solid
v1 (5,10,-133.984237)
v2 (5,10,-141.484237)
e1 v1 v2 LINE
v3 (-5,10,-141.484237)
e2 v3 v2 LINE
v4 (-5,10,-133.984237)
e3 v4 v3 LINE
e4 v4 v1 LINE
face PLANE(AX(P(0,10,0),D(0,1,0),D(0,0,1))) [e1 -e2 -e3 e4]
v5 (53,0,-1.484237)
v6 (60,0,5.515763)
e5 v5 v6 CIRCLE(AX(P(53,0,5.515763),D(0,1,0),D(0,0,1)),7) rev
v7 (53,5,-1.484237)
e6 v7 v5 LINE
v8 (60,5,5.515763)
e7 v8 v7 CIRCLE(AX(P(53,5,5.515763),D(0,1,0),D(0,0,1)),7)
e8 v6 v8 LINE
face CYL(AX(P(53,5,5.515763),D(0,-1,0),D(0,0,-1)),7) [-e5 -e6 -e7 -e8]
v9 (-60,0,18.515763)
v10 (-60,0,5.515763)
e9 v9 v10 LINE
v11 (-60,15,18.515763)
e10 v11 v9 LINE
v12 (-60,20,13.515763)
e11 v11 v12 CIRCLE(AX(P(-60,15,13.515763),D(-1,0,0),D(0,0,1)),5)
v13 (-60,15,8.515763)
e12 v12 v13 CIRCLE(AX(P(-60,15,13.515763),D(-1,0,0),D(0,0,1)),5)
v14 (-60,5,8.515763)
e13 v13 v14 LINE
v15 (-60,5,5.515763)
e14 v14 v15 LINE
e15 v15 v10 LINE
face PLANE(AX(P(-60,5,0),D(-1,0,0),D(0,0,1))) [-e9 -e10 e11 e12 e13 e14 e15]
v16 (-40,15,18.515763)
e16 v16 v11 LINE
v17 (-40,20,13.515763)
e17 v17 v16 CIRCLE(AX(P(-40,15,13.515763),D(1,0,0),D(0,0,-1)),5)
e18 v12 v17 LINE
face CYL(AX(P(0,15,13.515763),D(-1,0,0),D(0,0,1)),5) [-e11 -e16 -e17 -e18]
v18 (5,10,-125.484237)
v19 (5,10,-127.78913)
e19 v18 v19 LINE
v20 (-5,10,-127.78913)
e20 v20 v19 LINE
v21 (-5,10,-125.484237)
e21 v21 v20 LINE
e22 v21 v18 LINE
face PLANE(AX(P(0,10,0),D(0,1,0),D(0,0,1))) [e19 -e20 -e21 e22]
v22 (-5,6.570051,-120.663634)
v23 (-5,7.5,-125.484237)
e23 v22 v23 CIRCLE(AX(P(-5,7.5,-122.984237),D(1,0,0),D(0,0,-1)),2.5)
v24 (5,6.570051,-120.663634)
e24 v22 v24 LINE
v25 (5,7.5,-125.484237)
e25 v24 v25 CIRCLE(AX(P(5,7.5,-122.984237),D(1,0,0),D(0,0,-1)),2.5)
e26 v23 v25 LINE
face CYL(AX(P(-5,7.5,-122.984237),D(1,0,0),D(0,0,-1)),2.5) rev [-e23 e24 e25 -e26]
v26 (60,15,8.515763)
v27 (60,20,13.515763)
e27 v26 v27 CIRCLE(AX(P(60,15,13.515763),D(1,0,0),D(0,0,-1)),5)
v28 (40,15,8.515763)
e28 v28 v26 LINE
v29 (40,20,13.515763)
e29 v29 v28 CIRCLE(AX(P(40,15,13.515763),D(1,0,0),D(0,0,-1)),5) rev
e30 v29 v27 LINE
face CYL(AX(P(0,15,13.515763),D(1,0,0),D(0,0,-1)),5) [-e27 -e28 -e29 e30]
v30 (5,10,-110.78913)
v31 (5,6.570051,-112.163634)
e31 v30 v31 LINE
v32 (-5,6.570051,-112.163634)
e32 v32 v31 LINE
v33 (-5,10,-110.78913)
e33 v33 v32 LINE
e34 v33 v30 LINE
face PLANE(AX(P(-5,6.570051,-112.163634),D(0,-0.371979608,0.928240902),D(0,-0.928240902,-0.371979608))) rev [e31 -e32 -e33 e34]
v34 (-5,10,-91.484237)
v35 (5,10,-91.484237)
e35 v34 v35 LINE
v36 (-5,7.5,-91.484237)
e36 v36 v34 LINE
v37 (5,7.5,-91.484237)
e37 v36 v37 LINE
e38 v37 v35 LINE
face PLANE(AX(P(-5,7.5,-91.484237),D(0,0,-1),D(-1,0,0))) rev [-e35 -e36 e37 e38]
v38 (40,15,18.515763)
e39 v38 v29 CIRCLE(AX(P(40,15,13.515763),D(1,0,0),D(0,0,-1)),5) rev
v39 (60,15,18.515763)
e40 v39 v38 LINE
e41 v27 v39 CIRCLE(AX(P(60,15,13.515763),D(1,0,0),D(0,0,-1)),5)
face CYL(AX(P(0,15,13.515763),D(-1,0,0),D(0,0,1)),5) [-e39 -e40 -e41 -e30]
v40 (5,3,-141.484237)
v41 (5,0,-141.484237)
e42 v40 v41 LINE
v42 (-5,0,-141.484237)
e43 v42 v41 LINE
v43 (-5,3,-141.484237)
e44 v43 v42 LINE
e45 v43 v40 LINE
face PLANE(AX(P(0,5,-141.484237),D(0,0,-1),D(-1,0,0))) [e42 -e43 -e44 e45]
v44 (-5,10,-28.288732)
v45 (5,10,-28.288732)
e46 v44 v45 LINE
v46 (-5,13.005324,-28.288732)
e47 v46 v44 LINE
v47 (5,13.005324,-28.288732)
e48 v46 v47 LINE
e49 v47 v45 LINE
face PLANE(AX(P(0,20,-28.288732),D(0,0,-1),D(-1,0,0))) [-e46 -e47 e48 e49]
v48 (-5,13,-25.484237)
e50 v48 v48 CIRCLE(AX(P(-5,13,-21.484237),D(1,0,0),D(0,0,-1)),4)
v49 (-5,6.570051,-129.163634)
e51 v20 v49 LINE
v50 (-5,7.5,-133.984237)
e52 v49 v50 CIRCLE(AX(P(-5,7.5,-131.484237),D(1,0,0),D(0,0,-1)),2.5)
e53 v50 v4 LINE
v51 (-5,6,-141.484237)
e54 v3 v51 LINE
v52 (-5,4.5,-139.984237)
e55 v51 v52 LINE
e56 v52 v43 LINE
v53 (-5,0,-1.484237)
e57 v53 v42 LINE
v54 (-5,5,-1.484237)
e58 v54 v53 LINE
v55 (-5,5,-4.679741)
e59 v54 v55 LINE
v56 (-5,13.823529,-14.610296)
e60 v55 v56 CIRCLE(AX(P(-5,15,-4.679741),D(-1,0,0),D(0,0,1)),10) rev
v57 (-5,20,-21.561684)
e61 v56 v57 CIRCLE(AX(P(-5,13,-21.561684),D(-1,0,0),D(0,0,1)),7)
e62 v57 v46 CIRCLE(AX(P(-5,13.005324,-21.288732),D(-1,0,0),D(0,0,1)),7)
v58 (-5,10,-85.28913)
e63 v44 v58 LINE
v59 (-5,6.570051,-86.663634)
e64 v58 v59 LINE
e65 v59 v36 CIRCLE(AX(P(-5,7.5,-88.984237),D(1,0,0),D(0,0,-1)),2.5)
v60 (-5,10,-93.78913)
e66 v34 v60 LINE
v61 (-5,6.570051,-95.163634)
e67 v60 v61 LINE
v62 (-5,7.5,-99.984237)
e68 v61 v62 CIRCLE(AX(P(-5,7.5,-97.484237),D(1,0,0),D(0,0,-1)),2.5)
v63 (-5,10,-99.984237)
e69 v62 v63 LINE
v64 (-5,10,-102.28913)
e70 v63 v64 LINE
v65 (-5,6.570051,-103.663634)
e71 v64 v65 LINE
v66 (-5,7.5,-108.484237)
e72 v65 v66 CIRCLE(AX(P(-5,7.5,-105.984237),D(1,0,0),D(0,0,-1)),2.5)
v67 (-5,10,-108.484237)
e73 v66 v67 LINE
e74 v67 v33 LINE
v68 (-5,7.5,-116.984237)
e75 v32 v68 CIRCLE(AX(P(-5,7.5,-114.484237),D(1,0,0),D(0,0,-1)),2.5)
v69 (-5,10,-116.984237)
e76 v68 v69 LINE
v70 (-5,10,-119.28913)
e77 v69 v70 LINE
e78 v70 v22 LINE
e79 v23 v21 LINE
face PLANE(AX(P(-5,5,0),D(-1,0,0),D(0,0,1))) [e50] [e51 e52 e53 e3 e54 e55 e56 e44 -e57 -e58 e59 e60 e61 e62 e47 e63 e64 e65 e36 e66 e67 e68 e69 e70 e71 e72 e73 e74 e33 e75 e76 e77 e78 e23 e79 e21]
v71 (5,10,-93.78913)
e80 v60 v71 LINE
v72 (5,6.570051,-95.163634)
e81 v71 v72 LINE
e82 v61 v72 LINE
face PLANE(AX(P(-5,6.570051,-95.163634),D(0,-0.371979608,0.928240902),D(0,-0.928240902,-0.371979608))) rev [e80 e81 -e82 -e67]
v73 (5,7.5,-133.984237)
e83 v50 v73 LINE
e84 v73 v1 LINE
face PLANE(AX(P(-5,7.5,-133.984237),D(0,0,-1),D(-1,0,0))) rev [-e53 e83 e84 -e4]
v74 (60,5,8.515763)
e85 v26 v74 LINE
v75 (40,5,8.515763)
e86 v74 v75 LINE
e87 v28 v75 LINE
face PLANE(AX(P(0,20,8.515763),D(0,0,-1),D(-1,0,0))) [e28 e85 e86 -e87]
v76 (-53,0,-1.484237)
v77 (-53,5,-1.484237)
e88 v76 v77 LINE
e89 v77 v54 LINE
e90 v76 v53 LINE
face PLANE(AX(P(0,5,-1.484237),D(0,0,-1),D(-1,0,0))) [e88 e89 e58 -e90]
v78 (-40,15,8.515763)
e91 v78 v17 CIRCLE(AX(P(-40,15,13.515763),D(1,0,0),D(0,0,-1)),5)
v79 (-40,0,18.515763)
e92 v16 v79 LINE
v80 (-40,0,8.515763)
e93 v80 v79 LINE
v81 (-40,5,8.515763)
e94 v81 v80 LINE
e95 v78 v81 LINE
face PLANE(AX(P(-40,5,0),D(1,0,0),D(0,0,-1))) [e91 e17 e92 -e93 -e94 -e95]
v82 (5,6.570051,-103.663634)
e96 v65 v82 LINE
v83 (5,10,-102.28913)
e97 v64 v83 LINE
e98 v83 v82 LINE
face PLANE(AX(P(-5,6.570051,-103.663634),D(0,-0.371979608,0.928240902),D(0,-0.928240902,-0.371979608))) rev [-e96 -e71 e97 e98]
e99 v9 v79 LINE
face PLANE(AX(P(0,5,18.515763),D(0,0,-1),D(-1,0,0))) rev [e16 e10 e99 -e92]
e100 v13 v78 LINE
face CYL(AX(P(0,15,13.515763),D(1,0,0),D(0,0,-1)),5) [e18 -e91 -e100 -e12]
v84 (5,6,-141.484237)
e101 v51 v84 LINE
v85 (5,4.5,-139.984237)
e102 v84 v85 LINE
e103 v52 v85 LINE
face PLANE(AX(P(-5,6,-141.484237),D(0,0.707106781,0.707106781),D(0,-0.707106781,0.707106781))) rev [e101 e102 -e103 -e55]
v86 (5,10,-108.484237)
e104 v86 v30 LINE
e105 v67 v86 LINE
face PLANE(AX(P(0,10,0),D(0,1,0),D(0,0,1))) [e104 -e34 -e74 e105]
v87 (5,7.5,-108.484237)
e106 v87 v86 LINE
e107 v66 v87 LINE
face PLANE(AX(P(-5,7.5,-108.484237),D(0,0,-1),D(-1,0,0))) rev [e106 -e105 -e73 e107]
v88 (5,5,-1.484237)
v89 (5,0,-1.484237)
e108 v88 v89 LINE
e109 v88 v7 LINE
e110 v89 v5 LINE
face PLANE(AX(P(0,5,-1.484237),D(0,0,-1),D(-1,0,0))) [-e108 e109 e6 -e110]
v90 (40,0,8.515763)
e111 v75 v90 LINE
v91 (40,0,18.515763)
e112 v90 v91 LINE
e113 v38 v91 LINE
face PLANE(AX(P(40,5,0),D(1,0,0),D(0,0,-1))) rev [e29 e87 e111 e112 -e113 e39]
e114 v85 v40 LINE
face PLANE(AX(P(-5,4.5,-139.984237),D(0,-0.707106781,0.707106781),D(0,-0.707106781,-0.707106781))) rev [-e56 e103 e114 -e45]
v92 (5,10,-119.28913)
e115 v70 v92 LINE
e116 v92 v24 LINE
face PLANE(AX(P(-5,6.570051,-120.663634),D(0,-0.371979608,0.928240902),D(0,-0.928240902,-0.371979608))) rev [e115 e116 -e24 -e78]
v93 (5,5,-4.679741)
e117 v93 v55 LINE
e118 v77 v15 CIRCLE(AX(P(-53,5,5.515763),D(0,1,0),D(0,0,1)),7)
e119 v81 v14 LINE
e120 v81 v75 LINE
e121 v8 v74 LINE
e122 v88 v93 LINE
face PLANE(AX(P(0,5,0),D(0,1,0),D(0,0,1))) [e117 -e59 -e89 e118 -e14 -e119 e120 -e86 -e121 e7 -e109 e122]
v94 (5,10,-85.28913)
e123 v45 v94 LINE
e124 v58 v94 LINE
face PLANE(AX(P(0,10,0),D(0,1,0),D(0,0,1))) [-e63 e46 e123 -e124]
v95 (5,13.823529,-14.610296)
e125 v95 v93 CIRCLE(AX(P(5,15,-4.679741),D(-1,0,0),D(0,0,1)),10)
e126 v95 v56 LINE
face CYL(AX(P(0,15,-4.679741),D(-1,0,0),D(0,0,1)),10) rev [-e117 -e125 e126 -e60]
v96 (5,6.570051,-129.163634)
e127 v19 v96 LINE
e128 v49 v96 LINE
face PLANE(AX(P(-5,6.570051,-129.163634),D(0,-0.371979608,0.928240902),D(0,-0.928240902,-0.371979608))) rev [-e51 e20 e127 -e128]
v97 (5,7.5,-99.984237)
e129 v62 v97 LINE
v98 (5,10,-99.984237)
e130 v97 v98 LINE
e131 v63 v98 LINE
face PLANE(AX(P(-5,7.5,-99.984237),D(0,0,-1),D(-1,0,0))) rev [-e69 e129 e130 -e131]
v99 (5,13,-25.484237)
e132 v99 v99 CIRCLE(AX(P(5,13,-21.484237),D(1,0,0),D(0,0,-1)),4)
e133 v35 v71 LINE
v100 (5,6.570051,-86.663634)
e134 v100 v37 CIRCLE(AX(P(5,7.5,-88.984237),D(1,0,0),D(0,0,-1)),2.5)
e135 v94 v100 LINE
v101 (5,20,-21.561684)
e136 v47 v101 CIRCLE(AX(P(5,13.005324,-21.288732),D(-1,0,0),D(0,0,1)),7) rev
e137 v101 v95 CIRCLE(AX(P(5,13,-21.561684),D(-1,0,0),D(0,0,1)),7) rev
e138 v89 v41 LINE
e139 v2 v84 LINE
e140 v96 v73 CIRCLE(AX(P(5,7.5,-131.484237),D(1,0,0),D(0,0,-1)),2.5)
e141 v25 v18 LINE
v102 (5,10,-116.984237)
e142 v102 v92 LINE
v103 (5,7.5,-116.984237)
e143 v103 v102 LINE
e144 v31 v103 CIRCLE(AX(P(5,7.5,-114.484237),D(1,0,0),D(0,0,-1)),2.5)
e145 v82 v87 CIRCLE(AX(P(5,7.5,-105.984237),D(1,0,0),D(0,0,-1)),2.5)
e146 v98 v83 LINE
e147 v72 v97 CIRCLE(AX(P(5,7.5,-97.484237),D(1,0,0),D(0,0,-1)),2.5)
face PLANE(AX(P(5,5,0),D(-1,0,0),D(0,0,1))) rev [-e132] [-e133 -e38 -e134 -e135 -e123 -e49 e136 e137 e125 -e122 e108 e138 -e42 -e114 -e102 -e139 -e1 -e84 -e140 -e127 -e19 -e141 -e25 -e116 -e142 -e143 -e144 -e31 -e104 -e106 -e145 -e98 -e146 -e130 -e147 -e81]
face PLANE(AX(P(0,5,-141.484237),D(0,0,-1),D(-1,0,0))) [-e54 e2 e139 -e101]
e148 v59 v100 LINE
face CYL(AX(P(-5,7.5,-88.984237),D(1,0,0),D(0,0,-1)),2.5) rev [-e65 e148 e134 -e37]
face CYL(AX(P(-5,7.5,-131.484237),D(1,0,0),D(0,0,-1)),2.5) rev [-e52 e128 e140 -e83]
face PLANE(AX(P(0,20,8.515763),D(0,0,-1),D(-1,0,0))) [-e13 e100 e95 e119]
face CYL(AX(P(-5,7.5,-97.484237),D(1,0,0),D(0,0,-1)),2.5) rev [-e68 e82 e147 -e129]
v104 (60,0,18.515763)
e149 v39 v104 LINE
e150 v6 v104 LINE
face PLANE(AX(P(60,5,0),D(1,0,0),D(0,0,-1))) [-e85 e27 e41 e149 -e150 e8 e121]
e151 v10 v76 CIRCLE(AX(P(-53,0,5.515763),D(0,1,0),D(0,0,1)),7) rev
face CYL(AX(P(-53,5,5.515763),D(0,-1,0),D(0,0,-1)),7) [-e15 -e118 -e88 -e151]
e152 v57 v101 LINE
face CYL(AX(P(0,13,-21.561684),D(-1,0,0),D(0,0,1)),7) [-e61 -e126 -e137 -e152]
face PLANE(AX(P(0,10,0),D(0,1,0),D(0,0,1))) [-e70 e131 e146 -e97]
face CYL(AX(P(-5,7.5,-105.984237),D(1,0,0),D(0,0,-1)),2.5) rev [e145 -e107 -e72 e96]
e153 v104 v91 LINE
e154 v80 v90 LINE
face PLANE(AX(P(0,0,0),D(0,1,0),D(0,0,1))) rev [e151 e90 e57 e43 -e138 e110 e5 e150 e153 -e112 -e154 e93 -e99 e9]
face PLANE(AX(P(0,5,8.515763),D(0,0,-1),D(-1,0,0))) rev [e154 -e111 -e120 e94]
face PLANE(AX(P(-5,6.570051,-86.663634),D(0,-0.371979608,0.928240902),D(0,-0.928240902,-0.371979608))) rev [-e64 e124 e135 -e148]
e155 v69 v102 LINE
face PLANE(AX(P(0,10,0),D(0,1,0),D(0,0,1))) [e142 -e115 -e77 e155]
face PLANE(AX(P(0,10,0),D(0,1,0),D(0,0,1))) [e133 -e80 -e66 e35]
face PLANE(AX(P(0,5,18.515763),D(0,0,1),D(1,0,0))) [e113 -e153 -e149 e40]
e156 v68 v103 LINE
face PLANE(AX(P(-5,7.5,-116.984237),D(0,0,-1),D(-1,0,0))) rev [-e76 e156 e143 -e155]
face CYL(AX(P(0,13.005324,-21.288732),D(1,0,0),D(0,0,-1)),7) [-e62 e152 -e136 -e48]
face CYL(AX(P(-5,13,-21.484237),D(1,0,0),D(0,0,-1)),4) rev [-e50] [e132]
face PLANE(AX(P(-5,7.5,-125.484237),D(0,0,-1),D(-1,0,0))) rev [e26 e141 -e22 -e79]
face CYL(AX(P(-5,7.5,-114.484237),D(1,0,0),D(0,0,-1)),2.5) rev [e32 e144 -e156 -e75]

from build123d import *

# Parameters (mm, degrees)
SKETCH1_W           = 20
SKETCH1_H           = 10
SKETCH1_W_2         = 10
SKETCH1_H_2         = 13.195504549
SKETCH1_H_3         = 13.608990902
SKETCH1_H_4         = 113.195504549
BOSS_EXTRUDE1_DEPTH = 5
SKETCH1_3_W         = 20
SKETCH1_3_H         = 10
SKETCH1_3_W_2       = 10
SKETCH1_3_H_2       = 13.608990902
BOSS_EXTRUDE2_DEPTH = 20
SKETCH1_5_W         = 10
SKETCH1_5_H         = 113.195504549
BOSS_EXTRUDE3_DEPTH = 10
SKETCH3_R           = 4
CUT_EXTRUDE1_DEPTH  = 10
FILLET1_R           = 10
FILLET2_R           = 5
FILLET3_R           = 7
FILLET4_R           = 7
FILLET5_R           = 7


# Some blends are built 0.0001 mm under size
with BuildPart() as part:
    # Sketch1 → Boss-Extrude1 (new body)
    with BuildSketch(Plane(origin=(0, 0, 0), x_dir=(1, 0, 0), z_dir=(0, 1, 0))):
        Polygon((60, -8.515763432), (44.667493795, -8.515763432), (40, -8.515763432), (40, -18.515763432), (60, -18.515763432), align=None)
        Polygon((40, -8.515763432), (44.667493795, -8.515763432), (60, -8.515763432), (60, 1.484236568), (5, 1.484236568), (-5, 1.484236568), (-60, 1.484236568), (-60, -8.515763432), (-40, -8.515763432), align=None)
        with Locations((-50, -13.515763432)):
            Rectangle(SKETCH1_W, SKETCH1_H)
        with Locations((0, 8.081988842)):
            Rectangle(SKETCH1_W_2, SKETCH1_H_2)
        with Locations((0, 21.484236568)):
            Rectangle(SKETCH1_W_2, SKETCH1_H_3)
        with Locations((0, 84.886484294)):
            Rectangle(SKETCH1_W_2, SKETCH1_H_4)
    extrude(amount=BOSS_EXTRUDE1_DEPTH)

    # Sketch1<3> → Boss-Extrude2 (add)
    with BuildSketch(Plane(origin=(0, 0, 0), x_dir=(1, 0, 0), z_dir=(0, 1, 0))):
        with Locations((-50, -13.515763432)):
            Rectangle(SKETCH1_3_W, SKETCH1_3_H)
        Polygon((60, -8.515763432), (44.667493795, -8.515763432), (40, -8.515763432), (40, -18.515763432), (60, -18.515763432), align=None)
        with Locations((0, 21.484236568)):
            Rectangle(SKETCH1_3_W_2, SKETCH1_3_H_2)
    extrude(amount=BOSS_EXTRUDE2_DEPTH)

    # Sketch1<5> → Boss-Extrude3 (add)
    with BuildSketch(Plane(origin=(0, 0, 0), x_dir=(1, 0, 0), z_dir=(0, 1, 0))):
        with Locations((0, 84.886484294)):
            Rectangle(SKETCH1_5_W, SKETCH1_5_H)
    extrude(amount=BOSS_EXTRUDE3_DEPTH)

    # Sketch3 → Cut-Extrude1 (cut)
    with BuildSketch(Plane(origin=(5, 0, 0), x_dir=(0, 0, -1), z_dir=(1, 0, 0))):
        with Locations((21.484236568, 13)):
            Circle(SKETCH3_R)
        with BuildLine():
            Line((120.663634314, 6.570050981), (119.289130035, 10))
            Line((119.289130035, 10), (125.484236568, 10))
            Line((125.484236568, 10), (125.484236568, 7.5))
            ThreePointArc((125.484236568, 7.5), (123.457784012, 5.045259114), (120.663634314, 6.570050981))
        make_face()
        with BuildLine():
            Line((133.984236568, 7.5), (133.984236568, 10))
            Line((133.984236568, 10), (127.789130035, 10))
            Line((127.789130035, 10), (129.163634314, 6.570050981))
            ThreePointArc((129.163634314, 6.570050981), (131.957784012, 5.045259114), (133.984236568, 7.5))
        make_face()
        Polygon((141.484236568, 6), (139.984236568, 4.5), (141.484236568, 3), align=None)
        with BuildLine():
            Line((112.163634314, 6.570050981), (110.789130035, 10))
            Line((110.789130035, 10), (116.984236568, 10))
            Line((116.984236568, 10), (116.984236568, 7.5))
            ThreePointArc((116.984236568, 7.5), (114.957784012, 5.045259114), (112.163634314, 6.570050981))
        make_face()
        with BuildLine():
            Line((103.663634314, 6.570050981), (102.289130035, 10))
            Line((102.289130035, 10), (108.484236568, 10))
            Line((108.484236568, 10), (108.484236568, 7.5))
            ThreePointArc((108.484236568, 7.5), (106.457784012, 5.045259114), (103.663634314, 6.570050981))
        make_face()
        with BuildLine():
            Line((95.163634314, 6.570050981), (93.789130035, 10))
            Line((93.789130035, 10), (99.984236568, 10))
            Line((99.984236568, 10), (99.984236568, 7.5))
            ThreePointArc((99.984236568, 7.5), (97.957784012, 5.045259114), (95.163634314, 6.570050981))
        make_face()
        with BuildLine():
            Line((86.663634314, 6.570050981), (85.289130035, 10))
            Line((85.289130035, 10), (91.484236568, 10))
            Line((91.484236568, 10), (91.484236568, 7.5))
            ThreePointArc((91.484236568, 7.5), (89.457784012, 5.045259114), (86.663634314, 6.570050981))
        make_face()
    extrude(amount=-CUT_EXTRUDE1_DEPTH, mode=Mode.SUBTRACT)

    # Fillet1
    fillet1_edges = [part.edges().sort_by_distance(p)[0] for p in [
        (0, 5, -14.679741117),
    ]]
    fillet(fillet1_edges, radius=FILLET1_R)

    # Fillet2
    fillet2_edges = [part.edges().sort_by_distance(p)[0] for p in [
        (-50, 20, 8.515763432),
        (-50, 20, 18.515763432),
        (50, 20, 8.515763432),
        (50, 20, 18.515763432),
    ]]
    fillet(fillet2_edges, radius=FILLET2_R - 0.0001)  # a hair under: the kernel refuses the full size

    # Fillet3
    fillet3_edges = [part.edges().sort_by_distance(p)[0] for p in [
        (0, 20, -14.679741117),
    ]]
    fillet(fillet3_edges, radius=FILLET3_R)

    # Fillet4
    # the kernel refuses this fillet: 7 mm, written as the material it takes off along each edge
    with BuildSketch(Plane(origin=(22.486690858, 20, -28.288732019), x_dir=(0, 0, 1), z_dir=(-1, 0, 0))) as fillet4_piece_1:
        with BuildLine():
            CenterArc((7, -6.994676343), FILLET4_R, 92.234709992, 87.765290008)
            Line((0, -6.994676343), (-0.14, -6.994676343))
            Line((-0.14, -6.994676343), (-0.14, 0))
            Line((-0.14, 0), (0, 0.14))
            ThreePointArc((0, 0.14), (3.363523943, 0.14), (6.721588844, 0.139893527))
            Line((6.721588844, 0.139893527), (6.727047886, 0))
        make_face()
    extrude(amount=44.973381715, mode=Mode.SUBTRACT)

    # Fillet5
    fillet5_edges = [part.edges().sort_by_distance(p)[0] for p in [
        (-60, 2.5, -1.484236568),
        (60, 2.5, -1.484236568),
    ]]
    fillet(fillet5_edges, radius=FILLET5_R)


solid = part.part
